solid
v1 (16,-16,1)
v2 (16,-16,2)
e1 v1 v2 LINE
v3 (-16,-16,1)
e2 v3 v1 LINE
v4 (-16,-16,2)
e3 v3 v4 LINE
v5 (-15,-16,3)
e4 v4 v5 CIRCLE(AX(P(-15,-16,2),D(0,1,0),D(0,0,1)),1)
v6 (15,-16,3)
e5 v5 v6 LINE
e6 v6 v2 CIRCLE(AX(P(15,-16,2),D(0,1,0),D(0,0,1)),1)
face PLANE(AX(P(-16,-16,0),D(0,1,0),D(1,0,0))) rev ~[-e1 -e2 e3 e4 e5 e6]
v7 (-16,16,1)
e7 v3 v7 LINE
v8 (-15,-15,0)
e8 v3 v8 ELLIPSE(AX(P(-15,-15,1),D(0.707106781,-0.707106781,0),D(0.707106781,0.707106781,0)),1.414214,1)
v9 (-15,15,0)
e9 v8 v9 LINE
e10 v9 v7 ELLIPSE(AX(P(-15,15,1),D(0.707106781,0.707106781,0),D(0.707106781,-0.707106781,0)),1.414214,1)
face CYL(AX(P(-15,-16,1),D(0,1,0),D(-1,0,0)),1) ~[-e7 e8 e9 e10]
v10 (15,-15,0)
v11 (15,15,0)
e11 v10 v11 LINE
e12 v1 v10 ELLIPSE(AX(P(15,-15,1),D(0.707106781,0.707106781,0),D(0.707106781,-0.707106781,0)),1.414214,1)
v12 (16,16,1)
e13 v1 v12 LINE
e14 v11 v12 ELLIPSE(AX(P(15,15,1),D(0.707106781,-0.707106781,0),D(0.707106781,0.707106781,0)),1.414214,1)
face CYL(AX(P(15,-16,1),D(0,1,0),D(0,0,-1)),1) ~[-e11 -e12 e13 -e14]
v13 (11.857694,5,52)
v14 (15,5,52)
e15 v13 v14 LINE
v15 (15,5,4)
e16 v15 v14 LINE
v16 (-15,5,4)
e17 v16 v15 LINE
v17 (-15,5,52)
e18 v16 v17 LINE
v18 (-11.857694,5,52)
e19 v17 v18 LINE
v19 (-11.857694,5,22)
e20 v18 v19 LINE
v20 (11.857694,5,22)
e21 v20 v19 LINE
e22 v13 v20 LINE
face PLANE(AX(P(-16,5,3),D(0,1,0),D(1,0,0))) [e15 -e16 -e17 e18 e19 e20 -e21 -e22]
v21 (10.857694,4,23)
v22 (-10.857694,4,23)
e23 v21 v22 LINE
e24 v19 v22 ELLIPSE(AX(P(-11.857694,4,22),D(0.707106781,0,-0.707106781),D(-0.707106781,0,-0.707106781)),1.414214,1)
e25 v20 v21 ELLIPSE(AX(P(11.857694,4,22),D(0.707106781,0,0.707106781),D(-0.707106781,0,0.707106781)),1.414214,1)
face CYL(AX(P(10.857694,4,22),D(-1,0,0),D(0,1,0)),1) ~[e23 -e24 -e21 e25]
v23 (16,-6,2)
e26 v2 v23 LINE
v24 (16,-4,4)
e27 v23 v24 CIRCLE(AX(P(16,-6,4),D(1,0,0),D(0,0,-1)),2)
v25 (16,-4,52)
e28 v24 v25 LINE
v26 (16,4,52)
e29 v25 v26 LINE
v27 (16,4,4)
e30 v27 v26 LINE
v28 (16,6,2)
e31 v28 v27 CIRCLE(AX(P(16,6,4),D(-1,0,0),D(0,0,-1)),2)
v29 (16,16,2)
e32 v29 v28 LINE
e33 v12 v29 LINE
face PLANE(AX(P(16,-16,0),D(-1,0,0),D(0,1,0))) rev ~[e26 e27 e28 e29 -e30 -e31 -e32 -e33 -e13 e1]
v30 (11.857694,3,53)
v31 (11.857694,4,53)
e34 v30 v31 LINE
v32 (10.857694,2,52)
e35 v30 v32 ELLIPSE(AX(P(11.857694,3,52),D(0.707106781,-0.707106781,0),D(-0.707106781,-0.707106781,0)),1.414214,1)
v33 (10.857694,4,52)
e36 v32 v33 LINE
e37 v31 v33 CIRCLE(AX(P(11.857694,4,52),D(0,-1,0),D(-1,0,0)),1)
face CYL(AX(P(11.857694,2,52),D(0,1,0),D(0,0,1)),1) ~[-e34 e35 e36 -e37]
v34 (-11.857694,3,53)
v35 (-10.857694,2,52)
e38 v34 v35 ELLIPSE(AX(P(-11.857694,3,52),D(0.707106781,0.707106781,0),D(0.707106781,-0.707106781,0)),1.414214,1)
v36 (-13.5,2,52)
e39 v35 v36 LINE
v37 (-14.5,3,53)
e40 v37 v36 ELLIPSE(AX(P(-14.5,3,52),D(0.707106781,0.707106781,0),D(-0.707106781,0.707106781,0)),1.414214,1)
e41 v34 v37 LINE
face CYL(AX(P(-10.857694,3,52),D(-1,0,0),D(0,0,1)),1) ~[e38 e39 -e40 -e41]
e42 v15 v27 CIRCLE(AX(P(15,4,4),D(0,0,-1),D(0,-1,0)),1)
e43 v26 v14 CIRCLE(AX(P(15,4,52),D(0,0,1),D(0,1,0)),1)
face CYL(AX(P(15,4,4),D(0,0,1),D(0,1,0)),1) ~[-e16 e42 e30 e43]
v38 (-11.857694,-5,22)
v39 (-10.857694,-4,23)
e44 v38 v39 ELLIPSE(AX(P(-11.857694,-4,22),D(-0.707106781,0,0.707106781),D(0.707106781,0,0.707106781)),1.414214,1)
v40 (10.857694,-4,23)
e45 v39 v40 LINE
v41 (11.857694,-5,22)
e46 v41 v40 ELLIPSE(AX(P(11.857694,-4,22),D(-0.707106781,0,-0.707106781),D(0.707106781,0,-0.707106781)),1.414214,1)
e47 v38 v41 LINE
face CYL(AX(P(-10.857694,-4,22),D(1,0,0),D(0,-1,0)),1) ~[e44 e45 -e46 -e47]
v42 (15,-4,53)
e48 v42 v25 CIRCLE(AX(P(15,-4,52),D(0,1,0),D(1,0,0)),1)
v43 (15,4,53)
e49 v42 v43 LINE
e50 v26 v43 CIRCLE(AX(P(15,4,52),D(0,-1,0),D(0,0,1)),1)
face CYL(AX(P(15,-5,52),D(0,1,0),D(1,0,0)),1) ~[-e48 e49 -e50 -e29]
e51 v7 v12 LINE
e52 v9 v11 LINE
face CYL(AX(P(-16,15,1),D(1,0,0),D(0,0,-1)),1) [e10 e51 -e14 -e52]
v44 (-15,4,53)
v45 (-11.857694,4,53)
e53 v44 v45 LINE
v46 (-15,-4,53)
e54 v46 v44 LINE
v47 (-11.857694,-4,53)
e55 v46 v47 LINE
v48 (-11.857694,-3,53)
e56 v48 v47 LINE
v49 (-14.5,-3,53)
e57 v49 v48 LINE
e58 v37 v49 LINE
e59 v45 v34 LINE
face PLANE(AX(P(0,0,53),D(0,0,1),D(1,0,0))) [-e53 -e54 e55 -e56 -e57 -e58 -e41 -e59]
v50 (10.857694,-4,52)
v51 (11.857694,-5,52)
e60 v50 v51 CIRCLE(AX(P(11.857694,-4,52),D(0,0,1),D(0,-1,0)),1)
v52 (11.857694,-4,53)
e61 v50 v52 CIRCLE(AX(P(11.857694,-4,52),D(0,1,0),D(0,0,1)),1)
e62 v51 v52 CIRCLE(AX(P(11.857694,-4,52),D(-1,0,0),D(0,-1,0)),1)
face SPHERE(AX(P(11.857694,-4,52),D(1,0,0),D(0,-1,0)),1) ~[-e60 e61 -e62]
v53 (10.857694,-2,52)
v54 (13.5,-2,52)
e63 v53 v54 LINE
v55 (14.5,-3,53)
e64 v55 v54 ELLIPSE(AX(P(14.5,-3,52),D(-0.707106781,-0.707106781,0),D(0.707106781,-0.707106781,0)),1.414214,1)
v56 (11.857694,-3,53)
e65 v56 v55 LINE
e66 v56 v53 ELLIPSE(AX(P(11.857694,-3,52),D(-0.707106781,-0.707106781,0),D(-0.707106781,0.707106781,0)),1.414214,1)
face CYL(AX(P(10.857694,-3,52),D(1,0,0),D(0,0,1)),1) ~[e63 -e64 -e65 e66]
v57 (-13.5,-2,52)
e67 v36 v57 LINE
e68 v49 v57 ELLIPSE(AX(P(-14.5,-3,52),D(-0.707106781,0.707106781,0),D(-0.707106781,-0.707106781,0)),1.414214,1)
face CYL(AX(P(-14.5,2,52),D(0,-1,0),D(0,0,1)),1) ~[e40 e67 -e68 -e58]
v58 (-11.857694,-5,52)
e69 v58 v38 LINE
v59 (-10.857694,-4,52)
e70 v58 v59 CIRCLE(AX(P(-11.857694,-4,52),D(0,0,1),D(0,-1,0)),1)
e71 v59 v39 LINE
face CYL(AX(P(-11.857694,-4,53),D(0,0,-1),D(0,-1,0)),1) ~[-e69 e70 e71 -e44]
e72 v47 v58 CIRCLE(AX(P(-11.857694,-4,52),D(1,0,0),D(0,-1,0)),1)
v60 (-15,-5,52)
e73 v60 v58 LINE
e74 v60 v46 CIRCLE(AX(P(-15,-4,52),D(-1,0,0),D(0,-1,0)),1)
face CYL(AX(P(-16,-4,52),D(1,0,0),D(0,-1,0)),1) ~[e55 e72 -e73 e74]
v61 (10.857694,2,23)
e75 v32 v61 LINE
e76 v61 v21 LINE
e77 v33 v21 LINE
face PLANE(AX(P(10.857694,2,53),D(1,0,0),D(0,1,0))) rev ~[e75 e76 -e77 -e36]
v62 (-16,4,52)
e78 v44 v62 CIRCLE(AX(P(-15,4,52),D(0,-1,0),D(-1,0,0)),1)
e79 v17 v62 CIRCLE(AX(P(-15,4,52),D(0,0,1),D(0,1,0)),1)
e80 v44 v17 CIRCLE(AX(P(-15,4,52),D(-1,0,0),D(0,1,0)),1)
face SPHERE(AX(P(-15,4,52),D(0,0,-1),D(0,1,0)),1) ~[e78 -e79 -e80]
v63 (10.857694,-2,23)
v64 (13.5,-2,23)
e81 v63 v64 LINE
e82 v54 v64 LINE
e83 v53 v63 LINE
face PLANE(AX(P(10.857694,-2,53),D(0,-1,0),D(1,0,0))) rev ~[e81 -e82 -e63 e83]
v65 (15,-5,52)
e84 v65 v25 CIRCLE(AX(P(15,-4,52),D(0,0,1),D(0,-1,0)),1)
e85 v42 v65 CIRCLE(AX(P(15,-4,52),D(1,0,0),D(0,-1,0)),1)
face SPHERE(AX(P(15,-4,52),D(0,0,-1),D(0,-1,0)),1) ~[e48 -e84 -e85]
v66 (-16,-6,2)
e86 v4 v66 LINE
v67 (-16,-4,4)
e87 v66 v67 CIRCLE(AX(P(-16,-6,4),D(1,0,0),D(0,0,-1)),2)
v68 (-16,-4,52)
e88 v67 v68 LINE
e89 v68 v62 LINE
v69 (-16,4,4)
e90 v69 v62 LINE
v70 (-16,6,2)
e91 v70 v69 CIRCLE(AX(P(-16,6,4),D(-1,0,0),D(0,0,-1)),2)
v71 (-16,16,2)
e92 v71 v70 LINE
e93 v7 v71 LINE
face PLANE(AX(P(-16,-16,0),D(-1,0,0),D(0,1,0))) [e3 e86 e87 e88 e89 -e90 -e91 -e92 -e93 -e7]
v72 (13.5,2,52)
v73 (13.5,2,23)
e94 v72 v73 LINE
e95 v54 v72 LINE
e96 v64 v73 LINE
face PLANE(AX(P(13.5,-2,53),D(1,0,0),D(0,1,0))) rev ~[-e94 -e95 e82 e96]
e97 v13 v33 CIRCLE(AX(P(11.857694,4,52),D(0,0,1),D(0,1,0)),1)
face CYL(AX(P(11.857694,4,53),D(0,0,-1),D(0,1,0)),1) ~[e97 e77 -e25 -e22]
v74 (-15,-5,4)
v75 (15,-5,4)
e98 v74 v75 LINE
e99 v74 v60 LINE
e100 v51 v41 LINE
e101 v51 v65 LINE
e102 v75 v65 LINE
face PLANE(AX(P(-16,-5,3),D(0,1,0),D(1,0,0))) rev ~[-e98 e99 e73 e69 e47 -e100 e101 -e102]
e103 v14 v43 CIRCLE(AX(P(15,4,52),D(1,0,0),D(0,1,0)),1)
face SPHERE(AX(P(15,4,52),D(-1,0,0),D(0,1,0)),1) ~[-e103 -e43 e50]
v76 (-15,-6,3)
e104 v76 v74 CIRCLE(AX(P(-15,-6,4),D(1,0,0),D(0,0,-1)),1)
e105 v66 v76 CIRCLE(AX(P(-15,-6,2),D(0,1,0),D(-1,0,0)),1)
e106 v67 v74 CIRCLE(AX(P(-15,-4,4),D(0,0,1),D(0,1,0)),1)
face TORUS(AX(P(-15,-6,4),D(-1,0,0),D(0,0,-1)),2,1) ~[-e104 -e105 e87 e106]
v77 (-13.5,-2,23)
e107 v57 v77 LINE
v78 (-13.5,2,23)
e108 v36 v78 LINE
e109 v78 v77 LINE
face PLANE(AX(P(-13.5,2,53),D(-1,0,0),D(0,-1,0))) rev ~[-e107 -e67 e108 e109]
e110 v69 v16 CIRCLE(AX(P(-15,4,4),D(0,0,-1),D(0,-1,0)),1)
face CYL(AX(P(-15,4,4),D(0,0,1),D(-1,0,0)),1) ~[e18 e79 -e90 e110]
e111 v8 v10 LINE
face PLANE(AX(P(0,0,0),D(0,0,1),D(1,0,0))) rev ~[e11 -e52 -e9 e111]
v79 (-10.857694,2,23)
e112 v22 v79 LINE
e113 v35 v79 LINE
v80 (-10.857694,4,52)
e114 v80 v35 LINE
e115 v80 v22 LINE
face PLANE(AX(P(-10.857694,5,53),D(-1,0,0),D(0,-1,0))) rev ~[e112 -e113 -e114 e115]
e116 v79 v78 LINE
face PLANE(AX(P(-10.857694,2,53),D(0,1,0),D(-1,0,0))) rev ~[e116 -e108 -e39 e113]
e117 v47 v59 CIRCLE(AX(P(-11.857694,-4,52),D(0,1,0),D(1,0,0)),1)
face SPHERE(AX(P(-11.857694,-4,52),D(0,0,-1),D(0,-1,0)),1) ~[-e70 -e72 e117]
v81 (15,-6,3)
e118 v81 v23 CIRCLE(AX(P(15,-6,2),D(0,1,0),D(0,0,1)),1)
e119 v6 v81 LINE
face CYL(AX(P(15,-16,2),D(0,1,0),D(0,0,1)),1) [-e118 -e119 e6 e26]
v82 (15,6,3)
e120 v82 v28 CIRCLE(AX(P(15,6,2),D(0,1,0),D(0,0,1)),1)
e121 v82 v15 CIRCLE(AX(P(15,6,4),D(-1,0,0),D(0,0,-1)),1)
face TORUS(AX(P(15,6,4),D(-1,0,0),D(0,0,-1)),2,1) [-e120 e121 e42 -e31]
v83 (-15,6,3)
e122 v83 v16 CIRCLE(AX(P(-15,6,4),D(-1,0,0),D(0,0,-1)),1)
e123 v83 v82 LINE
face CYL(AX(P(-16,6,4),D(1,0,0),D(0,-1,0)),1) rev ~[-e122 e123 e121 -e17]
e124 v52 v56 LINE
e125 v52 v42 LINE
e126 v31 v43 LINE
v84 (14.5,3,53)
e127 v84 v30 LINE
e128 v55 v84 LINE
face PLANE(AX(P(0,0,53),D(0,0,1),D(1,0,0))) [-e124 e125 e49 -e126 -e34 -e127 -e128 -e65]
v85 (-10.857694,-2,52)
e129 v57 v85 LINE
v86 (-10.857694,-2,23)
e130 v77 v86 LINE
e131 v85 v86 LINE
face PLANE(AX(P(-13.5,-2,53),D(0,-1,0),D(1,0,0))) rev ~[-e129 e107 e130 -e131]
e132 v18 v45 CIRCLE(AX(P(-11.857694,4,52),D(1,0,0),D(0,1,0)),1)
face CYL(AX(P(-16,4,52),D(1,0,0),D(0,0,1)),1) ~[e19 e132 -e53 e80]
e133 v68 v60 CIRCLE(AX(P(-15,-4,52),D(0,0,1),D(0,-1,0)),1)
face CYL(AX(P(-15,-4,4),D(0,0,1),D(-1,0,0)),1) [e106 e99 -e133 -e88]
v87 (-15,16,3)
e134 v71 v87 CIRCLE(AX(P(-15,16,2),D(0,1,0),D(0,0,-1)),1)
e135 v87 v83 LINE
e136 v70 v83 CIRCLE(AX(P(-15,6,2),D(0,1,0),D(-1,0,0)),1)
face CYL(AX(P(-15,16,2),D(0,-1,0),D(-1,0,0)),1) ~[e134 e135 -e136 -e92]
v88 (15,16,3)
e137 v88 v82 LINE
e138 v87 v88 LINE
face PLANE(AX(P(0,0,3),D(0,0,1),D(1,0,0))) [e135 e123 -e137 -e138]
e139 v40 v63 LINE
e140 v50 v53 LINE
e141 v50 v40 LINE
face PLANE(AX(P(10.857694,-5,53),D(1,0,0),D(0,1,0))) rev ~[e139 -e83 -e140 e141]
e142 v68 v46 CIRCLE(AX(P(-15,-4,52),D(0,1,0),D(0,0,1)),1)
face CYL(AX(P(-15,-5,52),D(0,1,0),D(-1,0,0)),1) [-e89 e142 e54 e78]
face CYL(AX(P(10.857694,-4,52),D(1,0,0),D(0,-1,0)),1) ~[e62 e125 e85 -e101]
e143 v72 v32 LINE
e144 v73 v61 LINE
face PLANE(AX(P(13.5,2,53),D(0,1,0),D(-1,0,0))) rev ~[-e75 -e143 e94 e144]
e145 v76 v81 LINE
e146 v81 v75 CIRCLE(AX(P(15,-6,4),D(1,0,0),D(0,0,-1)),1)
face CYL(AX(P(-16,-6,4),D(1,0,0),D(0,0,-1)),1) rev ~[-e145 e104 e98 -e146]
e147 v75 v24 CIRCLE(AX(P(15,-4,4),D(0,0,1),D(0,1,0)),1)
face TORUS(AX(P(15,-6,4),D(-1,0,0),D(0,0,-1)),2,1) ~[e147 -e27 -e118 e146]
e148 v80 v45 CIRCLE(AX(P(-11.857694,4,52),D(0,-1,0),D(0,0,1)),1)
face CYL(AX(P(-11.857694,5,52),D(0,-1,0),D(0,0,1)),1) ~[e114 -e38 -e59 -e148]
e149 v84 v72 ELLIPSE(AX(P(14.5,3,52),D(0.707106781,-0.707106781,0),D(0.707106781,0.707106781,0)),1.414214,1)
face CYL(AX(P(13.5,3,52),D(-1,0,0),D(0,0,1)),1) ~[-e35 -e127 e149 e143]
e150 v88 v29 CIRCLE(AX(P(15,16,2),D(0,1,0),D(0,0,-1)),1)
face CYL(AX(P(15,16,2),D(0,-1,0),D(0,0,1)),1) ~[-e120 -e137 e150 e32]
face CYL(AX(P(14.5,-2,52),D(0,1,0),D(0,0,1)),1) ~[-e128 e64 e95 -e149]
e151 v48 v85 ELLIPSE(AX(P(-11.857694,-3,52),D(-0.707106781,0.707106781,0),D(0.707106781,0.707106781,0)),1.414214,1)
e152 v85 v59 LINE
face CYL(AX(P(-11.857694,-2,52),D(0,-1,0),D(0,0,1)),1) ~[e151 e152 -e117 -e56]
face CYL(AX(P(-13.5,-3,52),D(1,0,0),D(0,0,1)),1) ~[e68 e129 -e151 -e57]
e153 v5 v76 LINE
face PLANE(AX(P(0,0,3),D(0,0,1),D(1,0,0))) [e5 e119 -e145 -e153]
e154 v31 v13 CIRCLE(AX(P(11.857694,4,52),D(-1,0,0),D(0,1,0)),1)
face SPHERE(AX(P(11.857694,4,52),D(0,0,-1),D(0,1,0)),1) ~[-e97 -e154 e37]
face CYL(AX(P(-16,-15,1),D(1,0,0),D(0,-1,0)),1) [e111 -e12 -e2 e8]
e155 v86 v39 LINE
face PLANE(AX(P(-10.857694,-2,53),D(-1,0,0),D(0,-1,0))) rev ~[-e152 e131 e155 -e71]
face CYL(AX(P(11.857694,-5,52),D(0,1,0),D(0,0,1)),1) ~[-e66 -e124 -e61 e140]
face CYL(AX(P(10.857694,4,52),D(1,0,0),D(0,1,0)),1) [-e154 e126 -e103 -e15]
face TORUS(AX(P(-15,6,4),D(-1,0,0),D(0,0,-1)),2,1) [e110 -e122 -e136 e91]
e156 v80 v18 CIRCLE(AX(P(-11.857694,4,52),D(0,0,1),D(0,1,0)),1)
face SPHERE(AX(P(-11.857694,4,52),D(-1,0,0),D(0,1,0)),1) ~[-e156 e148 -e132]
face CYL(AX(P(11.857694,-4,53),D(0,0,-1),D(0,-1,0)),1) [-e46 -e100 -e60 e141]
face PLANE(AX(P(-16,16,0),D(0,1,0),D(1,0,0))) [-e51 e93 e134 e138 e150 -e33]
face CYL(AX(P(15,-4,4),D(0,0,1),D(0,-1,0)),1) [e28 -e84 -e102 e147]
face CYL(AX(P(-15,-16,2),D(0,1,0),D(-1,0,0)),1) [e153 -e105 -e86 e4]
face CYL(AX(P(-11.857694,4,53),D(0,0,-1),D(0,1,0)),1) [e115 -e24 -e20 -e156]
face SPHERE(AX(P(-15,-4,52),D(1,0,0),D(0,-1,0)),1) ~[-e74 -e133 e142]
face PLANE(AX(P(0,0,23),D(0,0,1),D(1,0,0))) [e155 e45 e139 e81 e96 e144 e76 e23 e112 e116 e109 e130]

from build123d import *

# Parameters (mm, degrees)
F0_W     = 32
F0_H     = 32
F1_DEPTH = 3
F2_W     = 32
F2_H     = 10
F3_DEPTH = 50
F5_DEPTH = 30
F6_F1_R  = 1
F6_F2_R  = 1


with BuildPart() as f1:
    # F0 (on Top) → F1 (new body)
    with BuildSketch(Plane.XY):
        Rectangle(F0_W, F0_H)
    extrude(amount=F1_DEPTH)

    # F2 (on face) → F3 (join)
    with BuildSketch(Plane.XY.offset(3)):
        Rectangle(F2_W, F2_H)
    extrude(amount=F3_DEPTH)

    # F4 (on face) → F5 (cut)
    with BuildSketch(Plane.XY.offset(53)):
        Polygon((10.8576942235, 5), (-10.8576942235, 5), (-10.8576942235, 2), (-13.5, 2), (-13.5, -2), (-10.8576942235, -2), (-10.8576942235, -5), (10.8576942235, -5), (10.8576942235, -2), (13.5, -2), (13.5, 2), (10.8576942235, 2), align=None)
    extrude(amount=-F5_DEPTH, mode=Mode.SUBTRACT)

    # F6: fillet of radius 1 on 32 edges, made by hand

    # F6_f1
    f6_f1_edges = [f1.edges().sort_by_distance(p)[0] for p in [
        (0, -5, 3),
        (0, 5, 3),
    ]]
    fillet(f6_f1_edges, radius=F6_F1_R)

    # F6_f2
    f6_f2_edges = [f1.edges().sort_by_distance(p)[0] for p in [
        (0, 16, 0),
        (-16, 0, 0),
        (0, -16, 0),
        (16, 0, 0),
        (16, -5, 28.5),
        (13.4288471118, -5, 53),
        (10.8576942235, -5, 38),
        (0, -5, 23),
        (-10.8576942235, -5, 38),
        (-13.4288471118, -5, 53),
        (-16, -5, 28.5),
        (-16, 5, 28.5),
        (-13.4288471118, 5, 53),
        (-10.8576942235, 5, 38),
        (0, 5, 23),
        (10.8576942235, 5, 38),
        (13.4288471118, 5, 53),
        (16, 5, 28.5),
        (16, 0, 53),
        (10.8576942235, -3.5, 53),
        (12.1788471118, -2, 53),
        (13.5, 0, 53),
        (12.1788471118, 2, 53),
        (10.8576942235, 3.5, 53),
        (-10.8576942235, 3.5, 53),
        (-12.1788471118, 2, 53),
        (-13.5, 0, 53),
        (-12.1788471118, -2, 53),
        (-10.8576942235, -3.5, 53),
        (-16, 0, 53),
        (16, 5.2928932188, 3.2928932188),
        (-16, 5.2928932188, 3.2928932188),
        (-16, -5.2928932188, 3.2928932188),
        (16, -5.2928932188, 3.2928932188),
    ]]
    fillet(f6_f2_edges, radius=F6_F2_R)


solid = f1.part
